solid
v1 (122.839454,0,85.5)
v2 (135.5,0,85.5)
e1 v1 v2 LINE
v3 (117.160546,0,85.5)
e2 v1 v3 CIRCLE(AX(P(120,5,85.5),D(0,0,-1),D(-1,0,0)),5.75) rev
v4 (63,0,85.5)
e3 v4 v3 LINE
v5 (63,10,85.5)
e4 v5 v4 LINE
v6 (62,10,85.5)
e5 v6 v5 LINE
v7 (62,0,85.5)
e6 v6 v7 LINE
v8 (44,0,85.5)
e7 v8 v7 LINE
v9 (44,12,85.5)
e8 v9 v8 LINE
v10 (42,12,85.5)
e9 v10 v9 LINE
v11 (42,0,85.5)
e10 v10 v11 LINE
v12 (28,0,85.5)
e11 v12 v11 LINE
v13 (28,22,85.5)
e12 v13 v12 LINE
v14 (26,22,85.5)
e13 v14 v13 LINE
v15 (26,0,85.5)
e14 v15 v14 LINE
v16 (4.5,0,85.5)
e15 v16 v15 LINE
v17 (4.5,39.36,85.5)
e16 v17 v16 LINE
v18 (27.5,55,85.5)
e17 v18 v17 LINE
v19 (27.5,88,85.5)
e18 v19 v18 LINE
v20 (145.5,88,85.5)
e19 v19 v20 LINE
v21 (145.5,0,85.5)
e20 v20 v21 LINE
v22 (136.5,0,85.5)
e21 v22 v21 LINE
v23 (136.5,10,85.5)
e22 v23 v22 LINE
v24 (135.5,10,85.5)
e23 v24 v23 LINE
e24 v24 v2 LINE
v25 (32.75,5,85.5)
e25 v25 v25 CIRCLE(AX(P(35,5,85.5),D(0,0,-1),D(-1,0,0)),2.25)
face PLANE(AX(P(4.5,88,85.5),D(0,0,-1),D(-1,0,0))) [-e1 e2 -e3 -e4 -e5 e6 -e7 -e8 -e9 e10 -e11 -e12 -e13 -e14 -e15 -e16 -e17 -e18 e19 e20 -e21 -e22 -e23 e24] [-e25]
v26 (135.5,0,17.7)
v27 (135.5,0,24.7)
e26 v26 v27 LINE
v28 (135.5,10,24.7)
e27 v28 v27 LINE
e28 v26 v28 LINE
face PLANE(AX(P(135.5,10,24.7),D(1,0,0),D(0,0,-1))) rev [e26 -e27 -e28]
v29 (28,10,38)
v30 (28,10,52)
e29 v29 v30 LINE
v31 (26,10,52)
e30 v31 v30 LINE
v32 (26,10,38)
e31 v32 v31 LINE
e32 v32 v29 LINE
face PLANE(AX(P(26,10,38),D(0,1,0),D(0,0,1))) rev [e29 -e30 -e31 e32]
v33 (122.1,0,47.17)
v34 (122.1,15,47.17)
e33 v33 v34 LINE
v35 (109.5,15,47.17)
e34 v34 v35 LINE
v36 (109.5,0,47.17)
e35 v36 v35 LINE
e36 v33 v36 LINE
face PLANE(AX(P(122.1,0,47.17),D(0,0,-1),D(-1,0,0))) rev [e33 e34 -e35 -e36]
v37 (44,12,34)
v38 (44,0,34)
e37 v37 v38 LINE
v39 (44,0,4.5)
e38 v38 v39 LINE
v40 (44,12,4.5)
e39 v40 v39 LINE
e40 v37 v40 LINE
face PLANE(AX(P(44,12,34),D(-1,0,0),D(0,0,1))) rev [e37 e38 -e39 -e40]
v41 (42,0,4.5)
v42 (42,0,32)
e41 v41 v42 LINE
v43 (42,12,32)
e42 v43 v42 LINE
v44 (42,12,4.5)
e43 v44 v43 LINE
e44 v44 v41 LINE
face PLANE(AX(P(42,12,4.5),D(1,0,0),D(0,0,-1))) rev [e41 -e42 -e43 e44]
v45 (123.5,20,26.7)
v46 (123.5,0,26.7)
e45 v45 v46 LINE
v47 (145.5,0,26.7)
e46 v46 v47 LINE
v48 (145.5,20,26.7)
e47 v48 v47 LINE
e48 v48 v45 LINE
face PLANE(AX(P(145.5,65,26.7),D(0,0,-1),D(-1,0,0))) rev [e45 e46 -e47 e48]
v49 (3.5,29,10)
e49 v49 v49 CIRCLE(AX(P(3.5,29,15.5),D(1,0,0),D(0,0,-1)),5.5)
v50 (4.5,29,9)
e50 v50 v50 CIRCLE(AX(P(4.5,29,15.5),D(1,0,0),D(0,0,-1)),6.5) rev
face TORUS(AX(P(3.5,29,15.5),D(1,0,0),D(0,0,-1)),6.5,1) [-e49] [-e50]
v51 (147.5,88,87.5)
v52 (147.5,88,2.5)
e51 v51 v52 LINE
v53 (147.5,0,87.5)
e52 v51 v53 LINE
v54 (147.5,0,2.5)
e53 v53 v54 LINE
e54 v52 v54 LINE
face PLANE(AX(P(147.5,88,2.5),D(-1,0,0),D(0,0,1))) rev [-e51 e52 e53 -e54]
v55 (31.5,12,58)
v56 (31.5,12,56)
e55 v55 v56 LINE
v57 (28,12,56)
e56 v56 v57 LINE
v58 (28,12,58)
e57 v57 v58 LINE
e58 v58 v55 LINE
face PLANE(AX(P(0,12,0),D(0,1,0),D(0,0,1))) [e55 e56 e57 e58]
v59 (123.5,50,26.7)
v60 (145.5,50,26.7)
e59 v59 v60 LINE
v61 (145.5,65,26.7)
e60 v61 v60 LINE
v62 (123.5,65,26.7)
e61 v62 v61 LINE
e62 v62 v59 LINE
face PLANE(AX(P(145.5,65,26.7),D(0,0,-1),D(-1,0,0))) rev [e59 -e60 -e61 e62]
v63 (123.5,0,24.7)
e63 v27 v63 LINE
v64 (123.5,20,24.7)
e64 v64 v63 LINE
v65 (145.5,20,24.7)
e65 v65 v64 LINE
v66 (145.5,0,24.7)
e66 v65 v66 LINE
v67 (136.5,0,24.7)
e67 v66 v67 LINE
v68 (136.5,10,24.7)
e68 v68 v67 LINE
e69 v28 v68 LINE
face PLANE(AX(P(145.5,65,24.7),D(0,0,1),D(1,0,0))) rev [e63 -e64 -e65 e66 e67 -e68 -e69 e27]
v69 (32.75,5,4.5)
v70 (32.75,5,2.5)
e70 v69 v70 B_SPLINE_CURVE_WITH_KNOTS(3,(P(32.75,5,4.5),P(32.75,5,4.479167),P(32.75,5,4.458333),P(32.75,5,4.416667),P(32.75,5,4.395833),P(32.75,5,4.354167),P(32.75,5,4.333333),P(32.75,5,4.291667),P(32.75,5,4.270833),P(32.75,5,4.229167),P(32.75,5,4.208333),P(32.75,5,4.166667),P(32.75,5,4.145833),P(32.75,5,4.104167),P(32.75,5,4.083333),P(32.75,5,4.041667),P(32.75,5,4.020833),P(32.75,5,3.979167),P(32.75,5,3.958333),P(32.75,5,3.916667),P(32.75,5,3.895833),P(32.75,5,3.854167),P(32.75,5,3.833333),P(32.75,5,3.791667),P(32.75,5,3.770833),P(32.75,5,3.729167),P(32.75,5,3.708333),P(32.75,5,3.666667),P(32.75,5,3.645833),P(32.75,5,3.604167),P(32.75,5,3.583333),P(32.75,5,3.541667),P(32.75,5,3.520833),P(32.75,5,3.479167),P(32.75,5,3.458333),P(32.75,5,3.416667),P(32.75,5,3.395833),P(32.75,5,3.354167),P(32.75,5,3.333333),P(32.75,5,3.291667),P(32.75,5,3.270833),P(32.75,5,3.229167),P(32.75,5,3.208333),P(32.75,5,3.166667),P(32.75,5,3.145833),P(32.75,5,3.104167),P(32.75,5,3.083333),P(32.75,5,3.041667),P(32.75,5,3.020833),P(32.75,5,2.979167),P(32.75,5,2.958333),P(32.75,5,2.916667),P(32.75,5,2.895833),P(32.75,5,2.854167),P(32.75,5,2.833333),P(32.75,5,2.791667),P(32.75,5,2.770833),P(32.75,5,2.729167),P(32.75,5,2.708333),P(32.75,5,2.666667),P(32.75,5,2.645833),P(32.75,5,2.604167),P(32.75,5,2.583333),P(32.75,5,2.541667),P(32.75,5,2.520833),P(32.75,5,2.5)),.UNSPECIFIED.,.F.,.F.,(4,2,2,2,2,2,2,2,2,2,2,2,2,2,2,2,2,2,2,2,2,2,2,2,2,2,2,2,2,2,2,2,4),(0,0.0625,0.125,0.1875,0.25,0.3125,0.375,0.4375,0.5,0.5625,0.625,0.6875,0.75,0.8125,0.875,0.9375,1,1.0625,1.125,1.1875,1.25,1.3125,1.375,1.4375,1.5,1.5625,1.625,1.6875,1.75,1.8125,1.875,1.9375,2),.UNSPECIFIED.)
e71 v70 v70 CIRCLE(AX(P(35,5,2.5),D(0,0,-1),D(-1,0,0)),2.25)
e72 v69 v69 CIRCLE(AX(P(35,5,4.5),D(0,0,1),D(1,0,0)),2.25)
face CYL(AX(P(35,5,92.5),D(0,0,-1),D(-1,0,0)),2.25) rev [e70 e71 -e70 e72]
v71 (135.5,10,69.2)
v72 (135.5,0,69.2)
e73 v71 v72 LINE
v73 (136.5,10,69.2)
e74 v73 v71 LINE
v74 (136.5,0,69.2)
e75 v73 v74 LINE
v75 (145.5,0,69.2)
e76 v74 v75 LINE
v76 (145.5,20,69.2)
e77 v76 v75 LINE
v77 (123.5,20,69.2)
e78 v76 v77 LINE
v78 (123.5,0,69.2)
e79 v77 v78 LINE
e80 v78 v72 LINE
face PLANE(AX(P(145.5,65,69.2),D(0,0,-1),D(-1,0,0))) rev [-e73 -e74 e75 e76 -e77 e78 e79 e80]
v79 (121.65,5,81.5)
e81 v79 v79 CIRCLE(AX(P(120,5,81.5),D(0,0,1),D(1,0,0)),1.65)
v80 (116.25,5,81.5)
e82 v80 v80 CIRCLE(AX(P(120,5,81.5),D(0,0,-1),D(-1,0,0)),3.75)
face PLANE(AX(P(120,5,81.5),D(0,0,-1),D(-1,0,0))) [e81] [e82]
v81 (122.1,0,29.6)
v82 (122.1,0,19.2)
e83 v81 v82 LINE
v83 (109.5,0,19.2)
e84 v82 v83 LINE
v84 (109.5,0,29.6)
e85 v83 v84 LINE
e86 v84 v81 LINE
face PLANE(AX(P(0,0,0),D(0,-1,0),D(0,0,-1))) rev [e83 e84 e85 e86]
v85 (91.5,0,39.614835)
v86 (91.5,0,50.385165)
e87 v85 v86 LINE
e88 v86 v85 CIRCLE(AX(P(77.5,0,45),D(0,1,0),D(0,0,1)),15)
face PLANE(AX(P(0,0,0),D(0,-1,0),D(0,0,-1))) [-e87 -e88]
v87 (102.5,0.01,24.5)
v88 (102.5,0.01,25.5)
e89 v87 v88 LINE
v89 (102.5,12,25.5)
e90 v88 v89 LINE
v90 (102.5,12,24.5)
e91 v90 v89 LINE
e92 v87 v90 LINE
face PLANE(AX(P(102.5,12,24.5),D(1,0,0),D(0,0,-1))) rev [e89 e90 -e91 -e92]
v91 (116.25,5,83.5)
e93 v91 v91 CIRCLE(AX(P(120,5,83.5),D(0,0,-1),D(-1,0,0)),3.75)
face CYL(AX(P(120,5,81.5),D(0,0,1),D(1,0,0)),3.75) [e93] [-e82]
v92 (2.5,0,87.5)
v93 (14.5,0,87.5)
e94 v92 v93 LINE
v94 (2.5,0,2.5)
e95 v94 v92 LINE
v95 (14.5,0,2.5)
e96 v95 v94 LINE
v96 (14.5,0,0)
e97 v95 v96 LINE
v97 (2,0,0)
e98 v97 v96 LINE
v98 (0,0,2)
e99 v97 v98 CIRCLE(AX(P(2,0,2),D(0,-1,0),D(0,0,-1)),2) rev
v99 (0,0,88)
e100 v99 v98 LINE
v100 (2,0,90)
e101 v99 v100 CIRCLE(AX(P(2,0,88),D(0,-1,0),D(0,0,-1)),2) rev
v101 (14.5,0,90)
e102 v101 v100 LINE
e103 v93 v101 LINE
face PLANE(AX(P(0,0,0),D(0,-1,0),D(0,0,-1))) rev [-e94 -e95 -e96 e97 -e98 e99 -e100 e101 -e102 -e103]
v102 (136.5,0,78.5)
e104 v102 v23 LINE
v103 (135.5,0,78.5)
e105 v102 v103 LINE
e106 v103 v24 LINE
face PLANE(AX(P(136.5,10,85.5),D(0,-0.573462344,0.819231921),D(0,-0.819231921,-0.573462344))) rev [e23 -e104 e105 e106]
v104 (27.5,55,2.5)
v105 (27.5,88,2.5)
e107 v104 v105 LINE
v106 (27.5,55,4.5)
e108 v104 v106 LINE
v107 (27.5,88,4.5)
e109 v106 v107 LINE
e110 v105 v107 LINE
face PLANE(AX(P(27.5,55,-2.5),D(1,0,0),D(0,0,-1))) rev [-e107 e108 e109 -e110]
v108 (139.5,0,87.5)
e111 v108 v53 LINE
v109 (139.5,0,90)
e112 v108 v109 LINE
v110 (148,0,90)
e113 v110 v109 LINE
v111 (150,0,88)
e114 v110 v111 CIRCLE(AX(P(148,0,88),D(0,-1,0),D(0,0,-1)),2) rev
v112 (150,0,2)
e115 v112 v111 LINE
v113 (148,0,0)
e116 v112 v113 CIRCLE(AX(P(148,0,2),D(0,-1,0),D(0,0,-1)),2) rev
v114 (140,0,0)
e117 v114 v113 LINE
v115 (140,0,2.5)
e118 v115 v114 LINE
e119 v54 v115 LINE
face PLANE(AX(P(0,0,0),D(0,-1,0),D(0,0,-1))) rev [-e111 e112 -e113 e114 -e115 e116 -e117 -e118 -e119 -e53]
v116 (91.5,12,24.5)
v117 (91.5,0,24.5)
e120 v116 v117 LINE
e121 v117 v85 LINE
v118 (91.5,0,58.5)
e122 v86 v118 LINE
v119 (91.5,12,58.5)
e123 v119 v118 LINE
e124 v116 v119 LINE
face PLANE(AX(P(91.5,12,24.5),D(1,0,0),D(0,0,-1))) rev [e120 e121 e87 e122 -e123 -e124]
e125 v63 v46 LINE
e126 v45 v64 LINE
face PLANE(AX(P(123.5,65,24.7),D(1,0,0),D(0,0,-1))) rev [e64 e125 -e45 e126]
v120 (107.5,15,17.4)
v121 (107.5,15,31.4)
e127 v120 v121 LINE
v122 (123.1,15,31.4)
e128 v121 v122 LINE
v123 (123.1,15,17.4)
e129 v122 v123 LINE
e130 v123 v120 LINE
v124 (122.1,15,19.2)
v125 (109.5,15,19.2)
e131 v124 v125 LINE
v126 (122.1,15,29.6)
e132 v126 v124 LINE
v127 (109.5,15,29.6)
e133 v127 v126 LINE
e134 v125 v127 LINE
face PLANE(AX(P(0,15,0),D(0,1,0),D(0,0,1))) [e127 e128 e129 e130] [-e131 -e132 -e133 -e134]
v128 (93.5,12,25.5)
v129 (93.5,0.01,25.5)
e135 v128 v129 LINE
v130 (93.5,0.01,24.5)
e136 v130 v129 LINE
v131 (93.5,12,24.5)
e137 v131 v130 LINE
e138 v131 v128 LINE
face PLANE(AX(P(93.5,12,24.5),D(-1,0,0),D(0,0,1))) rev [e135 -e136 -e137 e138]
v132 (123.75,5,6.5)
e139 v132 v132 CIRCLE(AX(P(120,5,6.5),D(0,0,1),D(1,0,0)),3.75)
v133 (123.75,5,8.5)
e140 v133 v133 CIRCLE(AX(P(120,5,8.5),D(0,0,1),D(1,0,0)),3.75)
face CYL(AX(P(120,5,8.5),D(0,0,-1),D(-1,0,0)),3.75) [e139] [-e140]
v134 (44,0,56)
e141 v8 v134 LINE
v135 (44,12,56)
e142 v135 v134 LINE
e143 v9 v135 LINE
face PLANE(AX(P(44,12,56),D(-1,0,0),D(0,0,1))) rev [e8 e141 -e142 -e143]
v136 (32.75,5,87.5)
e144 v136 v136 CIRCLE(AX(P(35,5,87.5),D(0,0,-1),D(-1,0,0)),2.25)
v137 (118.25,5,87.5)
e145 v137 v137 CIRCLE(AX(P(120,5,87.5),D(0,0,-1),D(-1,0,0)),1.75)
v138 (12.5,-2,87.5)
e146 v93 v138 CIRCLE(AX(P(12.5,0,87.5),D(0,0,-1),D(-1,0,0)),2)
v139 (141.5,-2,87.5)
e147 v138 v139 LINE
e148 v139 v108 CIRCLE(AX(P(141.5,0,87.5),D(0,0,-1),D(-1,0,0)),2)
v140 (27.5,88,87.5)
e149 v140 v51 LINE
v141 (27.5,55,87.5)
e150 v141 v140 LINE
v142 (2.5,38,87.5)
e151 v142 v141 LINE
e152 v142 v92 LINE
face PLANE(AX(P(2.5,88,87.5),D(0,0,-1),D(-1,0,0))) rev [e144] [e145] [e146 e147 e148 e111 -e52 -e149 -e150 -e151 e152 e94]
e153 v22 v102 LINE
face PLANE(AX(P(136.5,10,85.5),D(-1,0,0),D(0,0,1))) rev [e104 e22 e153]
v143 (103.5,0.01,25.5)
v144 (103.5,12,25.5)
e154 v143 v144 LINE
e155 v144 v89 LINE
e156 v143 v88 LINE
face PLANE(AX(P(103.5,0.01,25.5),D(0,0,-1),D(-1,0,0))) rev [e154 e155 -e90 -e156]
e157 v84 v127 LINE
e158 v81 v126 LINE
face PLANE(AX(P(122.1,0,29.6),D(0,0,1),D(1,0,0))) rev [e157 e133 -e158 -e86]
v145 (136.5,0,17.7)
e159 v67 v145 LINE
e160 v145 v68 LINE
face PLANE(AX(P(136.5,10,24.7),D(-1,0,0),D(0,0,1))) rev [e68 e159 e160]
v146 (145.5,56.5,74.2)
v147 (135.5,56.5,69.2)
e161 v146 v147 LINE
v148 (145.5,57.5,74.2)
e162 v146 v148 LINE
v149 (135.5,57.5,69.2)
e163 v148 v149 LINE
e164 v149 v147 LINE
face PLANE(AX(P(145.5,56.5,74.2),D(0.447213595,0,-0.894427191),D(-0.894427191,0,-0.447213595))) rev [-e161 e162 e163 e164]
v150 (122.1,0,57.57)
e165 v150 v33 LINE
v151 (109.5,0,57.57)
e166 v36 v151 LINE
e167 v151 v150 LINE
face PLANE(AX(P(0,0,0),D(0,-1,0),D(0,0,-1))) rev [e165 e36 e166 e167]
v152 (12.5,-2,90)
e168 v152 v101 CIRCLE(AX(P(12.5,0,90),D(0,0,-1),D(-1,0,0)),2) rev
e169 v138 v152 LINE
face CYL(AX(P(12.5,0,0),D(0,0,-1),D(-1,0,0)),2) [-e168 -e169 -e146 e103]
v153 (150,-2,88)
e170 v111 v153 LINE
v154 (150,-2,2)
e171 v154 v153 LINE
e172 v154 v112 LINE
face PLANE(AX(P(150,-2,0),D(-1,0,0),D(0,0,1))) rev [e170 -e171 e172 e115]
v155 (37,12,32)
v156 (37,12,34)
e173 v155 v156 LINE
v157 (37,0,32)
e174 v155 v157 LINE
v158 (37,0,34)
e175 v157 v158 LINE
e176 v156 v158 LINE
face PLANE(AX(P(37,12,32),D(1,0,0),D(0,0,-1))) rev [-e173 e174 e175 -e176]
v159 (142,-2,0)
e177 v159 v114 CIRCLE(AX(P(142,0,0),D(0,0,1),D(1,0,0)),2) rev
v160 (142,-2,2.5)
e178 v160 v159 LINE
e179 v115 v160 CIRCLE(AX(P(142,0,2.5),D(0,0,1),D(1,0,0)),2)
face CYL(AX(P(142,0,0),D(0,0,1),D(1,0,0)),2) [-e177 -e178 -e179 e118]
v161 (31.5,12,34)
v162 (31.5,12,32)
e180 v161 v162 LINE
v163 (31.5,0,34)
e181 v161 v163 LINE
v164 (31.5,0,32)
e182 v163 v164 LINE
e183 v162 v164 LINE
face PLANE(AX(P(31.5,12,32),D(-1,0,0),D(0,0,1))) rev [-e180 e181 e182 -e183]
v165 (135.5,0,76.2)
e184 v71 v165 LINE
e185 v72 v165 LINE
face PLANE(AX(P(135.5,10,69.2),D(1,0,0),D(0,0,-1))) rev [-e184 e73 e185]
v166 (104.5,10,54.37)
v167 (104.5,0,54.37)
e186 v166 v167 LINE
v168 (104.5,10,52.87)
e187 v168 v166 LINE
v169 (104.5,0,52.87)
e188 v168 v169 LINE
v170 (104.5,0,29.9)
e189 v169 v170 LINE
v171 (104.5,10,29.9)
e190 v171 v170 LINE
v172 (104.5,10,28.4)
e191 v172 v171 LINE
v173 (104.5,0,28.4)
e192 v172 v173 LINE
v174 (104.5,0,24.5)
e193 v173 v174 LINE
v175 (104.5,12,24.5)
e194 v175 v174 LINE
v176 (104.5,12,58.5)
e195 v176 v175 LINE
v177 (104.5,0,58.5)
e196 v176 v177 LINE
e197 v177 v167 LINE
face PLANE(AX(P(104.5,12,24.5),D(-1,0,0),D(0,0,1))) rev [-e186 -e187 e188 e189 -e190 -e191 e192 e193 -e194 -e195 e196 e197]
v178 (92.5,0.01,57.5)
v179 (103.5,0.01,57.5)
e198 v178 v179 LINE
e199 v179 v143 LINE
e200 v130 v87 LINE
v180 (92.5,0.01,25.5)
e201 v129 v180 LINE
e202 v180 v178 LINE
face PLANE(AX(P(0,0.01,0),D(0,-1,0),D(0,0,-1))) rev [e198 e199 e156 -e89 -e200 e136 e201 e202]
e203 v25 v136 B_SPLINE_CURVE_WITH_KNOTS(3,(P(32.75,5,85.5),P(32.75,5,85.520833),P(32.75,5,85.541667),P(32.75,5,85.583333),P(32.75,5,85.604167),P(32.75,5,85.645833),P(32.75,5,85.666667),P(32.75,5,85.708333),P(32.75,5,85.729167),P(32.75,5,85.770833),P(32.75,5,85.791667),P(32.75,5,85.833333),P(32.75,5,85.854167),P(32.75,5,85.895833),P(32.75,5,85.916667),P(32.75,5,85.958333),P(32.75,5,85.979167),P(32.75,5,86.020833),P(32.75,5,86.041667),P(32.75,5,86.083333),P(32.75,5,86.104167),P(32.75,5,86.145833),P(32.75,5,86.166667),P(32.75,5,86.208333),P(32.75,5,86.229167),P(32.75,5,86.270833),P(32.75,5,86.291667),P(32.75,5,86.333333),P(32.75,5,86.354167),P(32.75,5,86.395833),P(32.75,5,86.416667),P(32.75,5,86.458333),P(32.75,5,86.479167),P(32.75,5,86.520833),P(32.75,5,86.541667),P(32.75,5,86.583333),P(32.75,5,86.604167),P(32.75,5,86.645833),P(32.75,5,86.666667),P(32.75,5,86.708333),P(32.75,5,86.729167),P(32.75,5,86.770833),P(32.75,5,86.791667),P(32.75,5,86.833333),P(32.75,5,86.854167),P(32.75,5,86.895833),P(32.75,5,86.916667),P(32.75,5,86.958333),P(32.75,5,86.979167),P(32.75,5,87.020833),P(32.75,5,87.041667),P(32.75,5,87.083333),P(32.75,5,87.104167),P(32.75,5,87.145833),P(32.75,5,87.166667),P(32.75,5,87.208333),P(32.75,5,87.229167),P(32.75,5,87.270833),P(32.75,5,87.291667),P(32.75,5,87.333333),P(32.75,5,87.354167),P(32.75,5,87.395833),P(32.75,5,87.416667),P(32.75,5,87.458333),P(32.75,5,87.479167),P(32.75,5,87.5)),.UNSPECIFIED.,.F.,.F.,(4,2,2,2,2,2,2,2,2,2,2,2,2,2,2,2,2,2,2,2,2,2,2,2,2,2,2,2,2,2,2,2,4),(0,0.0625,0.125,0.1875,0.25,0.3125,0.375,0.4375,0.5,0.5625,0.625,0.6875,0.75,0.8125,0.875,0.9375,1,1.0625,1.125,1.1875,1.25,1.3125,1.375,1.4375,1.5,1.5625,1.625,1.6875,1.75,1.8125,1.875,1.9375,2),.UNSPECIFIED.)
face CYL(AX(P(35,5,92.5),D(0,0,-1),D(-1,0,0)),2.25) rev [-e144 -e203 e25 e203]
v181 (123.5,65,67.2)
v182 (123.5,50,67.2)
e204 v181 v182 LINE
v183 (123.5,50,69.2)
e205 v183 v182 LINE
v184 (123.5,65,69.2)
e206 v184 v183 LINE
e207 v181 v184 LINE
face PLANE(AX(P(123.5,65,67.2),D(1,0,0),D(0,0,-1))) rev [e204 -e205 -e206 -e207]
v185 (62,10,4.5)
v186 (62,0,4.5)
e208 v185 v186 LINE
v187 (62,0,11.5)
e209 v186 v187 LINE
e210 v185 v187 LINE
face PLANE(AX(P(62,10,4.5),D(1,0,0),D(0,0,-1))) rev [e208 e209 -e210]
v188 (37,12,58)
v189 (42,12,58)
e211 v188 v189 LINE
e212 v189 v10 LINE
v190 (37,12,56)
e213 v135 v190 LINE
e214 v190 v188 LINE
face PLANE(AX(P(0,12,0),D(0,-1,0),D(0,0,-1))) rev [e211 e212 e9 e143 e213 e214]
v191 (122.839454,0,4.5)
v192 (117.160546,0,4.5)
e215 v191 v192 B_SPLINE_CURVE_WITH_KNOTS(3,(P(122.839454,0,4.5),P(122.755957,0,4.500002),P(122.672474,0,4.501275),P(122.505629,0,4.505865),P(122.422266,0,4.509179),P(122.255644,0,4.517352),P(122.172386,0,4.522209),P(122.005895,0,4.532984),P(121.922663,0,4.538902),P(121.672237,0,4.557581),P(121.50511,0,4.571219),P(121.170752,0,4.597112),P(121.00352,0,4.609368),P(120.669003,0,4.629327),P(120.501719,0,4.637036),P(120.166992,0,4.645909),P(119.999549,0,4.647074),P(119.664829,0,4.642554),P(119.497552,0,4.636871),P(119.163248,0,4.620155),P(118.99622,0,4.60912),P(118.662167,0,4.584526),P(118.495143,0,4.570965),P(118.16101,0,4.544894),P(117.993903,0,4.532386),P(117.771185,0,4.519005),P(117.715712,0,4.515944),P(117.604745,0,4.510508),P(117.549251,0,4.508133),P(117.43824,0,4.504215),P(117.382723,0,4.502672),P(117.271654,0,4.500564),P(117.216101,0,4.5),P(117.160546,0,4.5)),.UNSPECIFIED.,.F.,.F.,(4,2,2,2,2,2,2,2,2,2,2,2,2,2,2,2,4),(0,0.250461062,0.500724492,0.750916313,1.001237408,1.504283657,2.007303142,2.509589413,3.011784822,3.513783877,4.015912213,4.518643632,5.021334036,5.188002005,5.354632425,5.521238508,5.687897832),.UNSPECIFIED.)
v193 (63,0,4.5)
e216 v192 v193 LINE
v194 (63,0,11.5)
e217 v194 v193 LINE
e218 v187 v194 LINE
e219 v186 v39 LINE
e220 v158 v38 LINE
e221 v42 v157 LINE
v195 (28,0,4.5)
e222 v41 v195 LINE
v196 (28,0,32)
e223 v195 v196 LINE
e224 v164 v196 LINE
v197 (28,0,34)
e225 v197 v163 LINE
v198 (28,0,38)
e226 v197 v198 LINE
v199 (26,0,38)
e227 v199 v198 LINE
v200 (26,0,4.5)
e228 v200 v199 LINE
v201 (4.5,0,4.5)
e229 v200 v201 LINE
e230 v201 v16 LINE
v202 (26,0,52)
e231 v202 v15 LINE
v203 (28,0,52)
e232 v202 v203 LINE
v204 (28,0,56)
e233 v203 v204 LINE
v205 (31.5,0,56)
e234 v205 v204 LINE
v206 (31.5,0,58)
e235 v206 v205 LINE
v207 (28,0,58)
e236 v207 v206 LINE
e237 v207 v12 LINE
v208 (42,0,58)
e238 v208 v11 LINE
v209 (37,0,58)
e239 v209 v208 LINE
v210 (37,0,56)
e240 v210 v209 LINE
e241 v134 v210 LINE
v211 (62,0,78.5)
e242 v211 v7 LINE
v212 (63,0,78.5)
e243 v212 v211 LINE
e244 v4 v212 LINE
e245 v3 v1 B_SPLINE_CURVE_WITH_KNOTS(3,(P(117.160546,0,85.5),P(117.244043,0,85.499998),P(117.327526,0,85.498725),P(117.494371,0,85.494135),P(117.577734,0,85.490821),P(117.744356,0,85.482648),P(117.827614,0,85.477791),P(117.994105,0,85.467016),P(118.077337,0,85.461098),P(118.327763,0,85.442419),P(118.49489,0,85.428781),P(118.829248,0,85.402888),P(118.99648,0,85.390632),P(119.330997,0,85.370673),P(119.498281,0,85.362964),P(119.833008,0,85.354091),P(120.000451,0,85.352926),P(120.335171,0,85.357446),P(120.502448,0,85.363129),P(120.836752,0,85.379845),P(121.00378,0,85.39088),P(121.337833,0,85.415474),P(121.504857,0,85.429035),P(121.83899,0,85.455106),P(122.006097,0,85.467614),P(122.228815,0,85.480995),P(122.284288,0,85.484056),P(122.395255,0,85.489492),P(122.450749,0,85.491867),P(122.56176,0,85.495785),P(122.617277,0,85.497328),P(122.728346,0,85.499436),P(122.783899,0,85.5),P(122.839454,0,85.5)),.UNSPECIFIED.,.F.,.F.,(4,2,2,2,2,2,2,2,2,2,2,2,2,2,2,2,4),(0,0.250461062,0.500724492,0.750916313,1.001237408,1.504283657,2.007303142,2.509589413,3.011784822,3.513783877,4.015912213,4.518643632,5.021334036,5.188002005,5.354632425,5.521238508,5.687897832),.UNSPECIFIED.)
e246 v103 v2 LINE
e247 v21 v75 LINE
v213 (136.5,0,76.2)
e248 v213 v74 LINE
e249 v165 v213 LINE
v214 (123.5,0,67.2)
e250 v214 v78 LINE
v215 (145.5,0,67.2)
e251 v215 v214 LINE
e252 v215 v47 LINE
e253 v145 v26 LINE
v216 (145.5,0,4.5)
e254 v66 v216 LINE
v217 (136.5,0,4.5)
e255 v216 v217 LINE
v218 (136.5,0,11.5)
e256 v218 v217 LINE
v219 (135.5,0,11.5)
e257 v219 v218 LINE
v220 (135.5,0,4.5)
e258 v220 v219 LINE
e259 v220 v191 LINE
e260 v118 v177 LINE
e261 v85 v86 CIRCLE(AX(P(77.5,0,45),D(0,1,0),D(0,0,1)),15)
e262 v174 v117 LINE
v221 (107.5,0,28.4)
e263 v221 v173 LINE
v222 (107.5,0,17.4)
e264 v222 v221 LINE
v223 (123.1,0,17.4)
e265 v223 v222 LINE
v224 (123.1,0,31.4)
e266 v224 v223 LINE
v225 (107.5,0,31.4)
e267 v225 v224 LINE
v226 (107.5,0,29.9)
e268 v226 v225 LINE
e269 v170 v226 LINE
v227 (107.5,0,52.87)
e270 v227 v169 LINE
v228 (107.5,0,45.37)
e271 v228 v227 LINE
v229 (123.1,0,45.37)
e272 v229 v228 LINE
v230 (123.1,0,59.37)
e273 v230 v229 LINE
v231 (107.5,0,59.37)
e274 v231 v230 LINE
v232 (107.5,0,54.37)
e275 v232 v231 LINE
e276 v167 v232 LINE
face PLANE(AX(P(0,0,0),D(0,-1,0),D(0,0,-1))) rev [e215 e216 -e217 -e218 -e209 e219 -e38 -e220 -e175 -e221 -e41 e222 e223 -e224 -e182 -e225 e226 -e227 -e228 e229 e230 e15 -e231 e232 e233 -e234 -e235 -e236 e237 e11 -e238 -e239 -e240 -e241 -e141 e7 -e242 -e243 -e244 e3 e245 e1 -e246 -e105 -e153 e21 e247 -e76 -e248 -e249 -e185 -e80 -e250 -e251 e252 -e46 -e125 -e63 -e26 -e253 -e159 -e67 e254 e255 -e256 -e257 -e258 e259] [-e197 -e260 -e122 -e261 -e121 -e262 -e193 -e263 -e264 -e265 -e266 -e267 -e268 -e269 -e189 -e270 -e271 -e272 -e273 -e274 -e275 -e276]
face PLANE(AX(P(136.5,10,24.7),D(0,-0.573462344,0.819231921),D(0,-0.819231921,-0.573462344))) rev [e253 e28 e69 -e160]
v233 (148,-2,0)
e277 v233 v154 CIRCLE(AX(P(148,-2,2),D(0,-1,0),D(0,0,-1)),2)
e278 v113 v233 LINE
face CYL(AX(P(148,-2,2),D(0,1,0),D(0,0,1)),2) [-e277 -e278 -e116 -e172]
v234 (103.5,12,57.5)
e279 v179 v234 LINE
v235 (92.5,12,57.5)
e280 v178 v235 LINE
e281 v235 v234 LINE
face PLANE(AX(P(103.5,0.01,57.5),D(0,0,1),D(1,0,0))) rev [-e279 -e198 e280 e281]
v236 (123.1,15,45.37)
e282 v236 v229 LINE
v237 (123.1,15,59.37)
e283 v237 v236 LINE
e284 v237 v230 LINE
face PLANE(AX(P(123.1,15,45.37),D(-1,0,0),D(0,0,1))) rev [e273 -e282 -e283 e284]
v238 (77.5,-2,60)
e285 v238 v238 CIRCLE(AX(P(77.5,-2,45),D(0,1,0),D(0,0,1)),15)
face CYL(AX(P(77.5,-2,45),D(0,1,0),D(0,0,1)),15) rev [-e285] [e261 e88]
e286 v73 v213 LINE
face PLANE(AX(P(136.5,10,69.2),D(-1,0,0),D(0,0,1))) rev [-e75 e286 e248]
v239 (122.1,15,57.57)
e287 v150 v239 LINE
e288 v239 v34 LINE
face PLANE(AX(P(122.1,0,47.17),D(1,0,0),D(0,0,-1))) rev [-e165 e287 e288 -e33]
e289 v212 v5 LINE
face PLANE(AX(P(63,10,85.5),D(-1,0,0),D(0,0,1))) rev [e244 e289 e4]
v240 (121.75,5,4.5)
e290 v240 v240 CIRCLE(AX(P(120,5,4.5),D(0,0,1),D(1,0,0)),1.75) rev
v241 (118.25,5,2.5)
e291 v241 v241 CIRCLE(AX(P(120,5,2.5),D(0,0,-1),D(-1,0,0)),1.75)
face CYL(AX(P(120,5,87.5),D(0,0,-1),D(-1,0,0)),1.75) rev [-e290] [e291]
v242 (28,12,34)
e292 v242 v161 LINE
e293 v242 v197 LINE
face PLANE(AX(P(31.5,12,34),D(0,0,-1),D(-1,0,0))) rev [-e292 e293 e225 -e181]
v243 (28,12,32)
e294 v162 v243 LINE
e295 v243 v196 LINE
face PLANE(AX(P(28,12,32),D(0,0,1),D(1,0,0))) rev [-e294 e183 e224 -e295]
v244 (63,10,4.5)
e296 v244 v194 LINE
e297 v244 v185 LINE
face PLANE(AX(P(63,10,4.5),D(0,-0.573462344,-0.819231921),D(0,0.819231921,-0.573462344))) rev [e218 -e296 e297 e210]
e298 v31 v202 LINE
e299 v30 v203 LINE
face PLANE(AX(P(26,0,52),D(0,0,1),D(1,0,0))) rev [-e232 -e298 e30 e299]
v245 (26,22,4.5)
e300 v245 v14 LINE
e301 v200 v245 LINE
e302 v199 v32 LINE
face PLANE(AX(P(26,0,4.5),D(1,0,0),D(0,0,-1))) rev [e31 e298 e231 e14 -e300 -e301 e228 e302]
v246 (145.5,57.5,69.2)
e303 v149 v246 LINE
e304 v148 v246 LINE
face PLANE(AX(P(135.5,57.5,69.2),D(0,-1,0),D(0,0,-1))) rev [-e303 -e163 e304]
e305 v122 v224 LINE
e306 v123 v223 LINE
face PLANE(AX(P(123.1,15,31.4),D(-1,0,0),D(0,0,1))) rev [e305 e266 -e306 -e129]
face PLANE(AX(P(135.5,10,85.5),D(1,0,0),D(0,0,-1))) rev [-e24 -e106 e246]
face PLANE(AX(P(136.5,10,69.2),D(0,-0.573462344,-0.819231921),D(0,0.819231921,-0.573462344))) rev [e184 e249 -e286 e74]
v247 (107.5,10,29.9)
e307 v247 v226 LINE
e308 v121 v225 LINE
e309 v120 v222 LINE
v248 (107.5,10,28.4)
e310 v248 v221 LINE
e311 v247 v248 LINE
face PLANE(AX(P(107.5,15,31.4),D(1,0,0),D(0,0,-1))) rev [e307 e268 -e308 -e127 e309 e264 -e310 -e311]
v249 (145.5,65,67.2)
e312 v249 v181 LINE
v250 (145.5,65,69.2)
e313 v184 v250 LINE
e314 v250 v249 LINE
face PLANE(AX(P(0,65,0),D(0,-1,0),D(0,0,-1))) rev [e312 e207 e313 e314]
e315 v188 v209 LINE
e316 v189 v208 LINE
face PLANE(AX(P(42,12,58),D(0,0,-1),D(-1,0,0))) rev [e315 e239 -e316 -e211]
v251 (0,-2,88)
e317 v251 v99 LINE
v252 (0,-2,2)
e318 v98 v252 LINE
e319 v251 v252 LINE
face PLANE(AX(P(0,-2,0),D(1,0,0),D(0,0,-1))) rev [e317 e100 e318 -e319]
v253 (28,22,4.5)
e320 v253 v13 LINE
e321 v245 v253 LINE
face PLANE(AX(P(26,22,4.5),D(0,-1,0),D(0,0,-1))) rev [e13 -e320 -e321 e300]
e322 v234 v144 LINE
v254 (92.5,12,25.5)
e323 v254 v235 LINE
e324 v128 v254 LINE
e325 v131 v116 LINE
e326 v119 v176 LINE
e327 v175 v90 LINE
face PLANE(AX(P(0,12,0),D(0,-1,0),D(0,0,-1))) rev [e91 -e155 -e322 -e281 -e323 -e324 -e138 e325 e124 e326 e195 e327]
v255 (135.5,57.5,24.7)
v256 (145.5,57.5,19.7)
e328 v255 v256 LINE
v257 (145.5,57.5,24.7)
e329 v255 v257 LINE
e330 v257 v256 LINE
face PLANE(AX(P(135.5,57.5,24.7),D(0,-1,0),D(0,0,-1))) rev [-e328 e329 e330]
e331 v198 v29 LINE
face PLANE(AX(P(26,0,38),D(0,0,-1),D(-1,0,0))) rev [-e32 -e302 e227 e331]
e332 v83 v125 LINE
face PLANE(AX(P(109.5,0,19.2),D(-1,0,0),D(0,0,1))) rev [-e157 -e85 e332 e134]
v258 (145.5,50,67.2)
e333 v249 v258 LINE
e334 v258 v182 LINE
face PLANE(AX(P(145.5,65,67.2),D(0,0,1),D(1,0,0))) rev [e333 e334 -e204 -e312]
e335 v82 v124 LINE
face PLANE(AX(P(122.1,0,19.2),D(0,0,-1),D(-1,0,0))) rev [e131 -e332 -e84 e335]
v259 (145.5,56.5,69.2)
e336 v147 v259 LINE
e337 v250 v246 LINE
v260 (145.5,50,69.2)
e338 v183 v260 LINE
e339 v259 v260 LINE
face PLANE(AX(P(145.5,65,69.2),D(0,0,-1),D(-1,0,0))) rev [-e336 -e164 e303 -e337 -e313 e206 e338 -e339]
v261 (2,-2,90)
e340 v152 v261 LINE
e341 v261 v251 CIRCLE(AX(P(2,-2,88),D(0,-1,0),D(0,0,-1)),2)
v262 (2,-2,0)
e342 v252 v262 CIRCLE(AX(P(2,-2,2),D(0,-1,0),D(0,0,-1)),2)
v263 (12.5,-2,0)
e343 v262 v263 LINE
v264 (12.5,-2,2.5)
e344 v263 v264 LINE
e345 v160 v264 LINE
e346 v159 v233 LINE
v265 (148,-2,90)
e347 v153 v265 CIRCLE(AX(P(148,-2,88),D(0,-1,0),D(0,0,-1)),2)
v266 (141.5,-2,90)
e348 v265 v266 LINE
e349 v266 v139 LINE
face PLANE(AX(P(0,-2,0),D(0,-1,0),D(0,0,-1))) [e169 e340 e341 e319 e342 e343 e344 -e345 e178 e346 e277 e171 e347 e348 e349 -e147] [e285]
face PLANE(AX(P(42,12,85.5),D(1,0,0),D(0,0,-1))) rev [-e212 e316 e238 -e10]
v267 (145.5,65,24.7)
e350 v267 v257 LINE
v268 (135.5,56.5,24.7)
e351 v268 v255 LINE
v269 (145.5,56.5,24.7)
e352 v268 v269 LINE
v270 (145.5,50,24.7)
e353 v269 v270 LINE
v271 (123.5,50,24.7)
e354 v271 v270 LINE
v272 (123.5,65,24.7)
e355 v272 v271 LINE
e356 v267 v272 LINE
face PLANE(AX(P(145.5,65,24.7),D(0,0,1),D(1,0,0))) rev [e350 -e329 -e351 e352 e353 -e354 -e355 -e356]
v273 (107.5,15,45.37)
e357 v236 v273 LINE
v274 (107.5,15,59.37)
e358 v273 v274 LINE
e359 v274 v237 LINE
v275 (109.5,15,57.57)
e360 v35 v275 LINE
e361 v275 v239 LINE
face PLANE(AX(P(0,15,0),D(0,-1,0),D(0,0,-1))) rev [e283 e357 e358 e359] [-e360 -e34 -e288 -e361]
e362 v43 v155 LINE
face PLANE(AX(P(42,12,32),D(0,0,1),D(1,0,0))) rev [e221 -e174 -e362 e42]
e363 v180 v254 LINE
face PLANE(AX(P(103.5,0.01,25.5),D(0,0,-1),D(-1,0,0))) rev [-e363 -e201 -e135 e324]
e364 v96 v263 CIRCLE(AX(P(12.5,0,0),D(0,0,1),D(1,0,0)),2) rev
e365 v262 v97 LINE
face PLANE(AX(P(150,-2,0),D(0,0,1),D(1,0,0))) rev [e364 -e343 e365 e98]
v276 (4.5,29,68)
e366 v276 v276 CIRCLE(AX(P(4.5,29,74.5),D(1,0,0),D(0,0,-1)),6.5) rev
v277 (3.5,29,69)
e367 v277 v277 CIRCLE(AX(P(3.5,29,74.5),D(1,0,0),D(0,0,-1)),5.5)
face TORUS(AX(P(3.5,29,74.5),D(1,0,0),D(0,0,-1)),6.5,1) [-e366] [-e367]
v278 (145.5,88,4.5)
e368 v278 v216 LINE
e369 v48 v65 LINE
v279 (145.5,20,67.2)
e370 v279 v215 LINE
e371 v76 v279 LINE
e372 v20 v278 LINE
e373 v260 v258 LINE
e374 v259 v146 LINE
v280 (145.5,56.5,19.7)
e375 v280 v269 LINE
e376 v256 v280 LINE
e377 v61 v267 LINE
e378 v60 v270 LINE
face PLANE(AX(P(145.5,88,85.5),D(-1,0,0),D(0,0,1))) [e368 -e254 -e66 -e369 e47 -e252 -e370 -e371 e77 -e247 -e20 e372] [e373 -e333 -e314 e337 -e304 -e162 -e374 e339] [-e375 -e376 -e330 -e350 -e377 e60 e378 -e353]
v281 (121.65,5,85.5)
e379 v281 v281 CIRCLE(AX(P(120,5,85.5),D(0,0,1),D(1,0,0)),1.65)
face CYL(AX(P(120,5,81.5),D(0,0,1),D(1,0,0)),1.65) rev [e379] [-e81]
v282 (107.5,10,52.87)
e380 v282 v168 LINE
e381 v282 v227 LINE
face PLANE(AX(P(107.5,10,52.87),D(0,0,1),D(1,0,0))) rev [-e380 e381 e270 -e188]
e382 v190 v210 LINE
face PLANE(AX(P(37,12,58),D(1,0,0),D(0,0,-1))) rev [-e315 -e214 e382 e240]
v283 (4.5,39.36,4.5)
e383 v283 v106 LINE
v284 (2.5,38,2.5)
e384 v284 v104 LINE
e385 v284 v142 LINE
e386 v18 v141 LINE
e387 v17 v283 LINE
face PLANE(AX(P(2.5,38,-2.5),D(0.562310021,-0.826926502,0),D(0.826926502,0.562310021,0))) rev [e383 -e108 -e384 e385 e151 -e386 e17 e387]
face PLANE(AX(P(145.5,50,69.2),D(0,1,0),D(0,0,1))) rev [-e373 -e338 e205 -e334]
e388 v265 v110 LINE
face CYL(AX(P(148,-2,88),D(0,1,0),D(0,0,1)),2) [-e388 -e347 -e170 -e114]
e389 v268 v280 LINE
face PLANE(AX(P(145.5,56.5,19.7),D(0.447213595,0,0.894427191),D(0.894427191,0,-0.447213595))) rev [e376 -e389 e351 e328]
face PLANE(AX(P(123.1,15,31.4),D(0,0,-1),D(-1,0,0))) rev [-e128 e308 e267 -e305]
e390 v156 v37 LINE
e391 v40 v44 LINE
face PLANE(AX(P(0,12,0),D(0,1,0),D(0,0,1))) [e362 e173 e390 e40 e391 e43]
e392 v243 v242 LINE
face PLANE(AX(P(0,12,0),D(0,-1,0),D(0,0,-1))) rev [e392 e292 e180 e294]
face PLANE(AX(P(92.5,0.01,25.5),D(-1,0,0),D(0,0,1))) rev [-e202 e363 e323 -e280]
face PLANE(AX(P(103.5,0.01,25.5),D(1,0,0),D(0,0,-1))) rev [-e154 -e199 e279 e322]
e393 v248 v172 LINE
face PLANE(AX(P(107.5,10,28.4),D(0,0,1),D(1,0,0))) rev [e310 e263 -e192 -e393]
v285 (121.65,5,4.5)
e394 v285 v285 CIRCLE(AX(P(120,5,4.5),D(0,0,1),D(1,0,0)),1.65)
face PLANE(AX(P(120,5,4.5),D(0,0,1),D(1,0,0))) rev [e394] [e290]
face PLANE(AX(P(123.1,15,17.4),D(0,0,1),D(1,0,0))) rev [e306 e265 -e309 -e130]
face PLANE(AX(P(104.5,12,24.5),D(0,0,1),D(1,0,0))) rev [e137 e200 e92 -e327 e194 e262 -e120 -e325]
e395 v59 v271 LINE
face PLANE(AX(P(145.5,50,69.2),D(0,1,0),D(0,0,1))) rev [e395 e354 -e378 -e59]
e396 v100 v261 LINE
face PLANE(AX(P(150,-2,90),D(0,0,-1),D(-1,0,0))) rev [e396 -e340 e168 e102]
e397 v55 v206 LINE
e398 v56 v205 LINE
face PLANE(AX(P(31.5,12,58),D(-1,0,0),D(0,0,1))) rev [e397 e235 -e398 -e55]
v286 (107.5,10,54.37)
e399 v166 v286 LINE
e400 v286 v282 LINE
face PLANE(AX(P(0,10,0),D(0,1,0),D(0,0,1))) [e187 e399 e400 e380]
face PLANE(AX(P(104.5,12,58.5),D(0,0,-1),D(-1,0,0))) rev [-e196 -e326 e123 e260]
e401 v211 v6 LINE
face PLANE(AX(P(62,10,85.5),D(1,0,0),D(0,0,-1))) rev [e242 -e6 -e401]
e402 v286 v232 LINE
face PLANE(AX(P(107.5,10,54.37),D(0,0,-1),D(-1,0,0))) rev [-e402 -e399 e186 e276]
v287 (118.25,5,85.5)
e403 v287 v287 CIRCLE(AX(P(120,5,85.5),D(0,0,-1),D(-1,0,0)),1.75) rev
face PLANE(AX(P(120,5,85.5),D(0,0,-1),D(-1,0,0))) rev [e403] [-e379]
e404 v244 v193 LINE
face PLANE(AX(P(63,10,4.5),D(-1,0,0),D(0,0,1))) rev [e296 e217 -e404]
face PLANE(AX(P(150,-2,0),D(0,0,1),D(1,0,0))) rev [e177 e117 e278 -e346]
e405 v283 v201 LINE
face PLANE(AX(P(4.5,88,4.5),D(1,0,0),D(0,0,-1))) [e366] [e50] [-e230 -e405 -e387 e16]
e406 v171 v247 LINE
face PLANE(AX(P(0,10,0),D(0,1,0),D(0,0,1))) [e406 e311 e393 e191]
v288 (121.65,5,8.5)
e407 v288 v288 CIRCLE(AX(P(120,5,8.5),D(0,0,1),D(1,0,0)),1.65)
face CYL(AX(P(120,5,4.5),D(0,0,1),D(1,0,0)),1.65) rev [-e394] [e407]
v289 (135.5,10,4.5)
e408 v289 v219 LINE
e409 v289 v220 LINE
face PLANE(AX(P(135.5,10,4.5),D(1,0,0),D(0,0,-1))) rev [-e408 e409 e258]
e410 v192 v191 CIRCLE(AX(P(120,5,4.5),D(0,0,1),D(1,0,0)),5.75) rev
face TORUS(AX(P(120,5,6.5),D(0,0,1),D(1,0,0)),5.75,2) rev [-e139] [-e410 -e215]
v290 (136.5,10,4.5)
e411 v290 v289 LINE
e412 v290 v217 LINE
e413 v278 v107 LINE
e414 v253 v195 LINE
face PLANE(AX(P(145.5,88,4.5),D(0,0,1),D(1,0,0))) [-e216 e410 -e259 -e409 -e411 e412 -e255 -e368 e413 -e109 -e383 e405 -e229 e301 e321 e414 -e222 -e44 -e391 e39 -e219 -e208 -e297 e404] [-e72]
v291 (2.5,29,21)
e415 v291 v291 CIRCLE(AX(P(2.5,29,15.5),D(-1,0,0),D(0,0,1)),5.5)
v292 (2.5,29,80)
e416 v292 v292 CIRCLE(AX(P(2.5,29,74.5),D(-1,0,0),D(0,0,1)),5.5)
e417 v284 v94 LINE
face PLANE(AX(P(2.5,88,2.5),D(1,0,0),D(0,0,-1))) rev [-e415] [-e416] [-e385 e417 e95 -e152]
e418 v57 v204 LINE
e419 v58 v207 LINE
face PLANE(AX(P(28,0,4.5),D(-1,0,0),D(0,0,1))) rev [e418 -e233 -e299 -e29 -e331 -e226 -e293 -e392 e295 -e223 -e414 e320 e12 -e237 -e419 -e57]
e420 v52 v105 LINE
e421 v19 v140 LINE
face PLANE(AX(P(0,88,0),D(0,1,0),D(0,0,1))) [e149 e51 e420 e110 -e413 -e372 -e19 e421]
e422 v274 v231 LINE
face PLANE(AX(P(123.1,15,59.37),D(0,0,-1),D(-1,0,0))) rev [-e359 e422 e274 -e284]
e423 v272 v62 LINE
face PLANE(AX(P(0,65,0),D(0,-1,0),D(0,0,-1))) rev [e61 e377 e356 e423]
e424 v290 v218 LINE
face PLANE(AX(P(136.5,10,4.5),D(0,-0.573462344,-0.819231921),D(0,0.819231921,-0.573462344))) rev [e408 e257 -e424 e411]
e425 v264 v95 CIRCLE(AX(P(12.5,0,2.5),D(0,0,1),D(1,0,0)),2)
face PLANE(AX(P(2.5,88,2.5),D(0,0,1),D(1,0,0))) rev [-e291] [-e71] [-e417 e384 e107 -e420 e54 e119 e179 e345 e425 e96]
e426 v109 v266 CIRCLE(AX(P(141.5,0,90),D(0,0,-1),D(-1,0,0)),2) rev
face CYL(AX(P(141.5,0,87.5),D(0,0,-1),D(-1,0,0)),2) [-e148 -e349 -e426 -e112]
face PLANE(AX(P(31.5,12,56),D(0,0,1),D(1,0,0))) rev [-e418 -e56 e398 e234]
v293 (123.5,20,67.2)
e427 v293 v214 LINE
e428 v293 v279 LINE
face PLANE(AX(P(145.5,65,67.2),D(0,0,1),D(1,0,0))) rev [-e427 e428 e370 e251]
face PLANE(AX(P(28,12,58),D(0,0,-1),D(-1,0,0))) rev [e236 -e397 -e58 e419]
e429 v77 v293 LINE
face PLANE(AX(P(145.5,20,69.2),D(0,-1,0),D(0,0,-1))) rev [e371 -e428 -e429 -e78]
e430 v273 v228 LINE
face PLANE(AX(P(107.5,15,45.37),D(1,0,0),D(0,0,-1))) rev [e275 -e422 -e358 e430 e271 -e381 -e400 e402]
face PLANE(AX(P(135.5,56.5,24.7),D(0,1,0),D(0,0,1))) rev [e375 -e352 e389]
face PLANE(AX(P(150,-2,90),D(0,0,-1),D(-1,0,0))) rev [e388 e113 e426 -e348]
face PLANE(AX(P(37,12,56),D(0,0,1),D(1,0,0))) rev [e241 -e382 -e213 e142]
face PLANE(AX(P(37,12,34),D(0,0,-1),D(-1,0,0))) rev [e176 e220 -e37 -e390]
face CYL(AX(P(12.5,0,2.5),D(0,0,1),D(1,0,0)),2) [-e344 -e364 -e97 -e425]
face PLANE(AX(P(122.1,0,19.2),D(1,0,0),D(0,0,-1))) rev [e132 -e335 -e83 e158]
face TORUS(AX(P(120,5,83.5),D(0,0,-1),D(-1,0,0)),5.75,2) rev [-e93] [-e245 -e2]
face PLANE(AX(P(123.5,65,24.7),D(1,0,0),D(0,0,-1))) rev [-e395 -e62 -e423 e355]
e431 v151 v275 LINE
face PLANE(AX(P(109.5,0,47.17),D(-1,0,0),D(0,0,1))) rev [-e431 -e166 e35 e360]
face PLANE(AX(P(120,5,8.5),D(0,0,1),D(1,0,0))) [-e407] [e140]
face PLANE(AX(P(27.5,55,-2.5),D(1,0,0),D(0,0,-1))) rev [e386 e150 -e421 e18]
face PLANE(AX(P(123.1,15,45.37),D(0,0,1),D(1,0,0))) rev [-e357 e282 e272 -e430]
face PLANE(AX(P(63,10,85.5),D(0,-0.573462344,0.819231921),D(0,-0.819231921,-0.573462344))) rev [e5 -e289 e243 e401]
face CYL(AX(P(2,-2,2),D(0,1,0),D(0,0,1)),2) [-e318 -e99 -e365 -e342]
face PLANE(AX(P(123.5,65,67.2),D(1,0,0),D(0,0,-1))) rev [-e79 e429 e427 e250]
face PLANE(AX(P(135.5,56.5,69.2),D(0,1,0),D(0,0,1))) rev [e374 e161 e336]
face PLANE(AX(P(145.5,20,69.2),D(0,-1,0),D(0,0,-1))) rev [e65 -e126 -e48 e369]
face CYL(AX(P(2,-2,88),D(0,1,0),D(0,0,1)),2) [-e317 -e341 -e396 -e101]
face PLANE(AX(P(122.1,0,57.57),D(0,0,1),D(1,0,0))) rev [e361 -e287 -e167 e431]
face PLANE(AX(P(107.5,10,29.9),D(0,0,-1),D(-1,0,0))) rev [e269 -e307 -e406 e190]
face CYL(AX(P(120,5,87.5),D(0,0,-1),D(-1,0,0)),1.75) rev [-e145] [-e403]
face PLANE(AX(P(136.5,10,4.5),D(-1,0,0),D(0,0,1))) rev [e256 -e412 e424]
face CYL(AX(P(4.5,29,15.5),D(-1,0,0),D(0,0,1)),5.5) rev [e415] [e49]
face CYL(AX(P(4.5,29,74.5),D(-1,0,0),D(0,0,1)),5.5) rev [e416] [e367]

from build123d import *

# Parameters (mm, degrees)
ESQUISSE1_W              = 150
ESQUISSE1_H              = 90
BOSS_EXTRU_1_DEPTH       = 2
ESQUISSE2_W              = 145
ESQUISSE2_H              = 85
ESQUISSE2_W_2            = 141
ESQUISSE2_H_2            = 81
BOSS_EXTRU_2_DEPTH       = 88
ESQUISSE3_R              = 15
ENL_V_MAT_EXTRU_1_DEPTH  = 2
ENL_V_MAT_EXTRU_2_DEPTH  = 90
ESQUISSE6_R              = 2.25
ENL_V_MAT_EXTRU_4_DEPTH  = 90
CONG_1_R                 = 2
ESQUISSE9_W              = 2
ESQUISSE9_H              = 22
BOSS_EXTRU_5_DEPTH       = 81
ESQUISSE11_W             = 3.5
ESQUISSE11_H             = 2
BOSS_EXTRU_6_DEPTH       = 12
ESQUISSE13_R             = 5.5
ENL_V_MAT_EXTRU_5_DEPTH  = 2
CONG_2_R                 = 1
ESQUISSE14_W             = 22
ESQUISSE14_H             = 2
BOSS_EXTRU_7_DEPTH       = 65
ESQUISSE16_W             = 125
ESQUISSE16_H             = 2
ENL_V_MAT_EXTRU_6_DEPTH  = 2.5
ESQUISSE18_W             = 125.5
ESQUISSE18_H             = 2
ENL_V_MAT_EXTRU_7_DEPTH  = 2.5
CONG_3_R                 = 2
ESQUISSE26_R             = 1.75
ENL_V_MAT_EXTRU_12_DEPTH = 85
ESQUISSE19_W             = 14
ESQUISSE19_H             = 10
ENL_V_MAT_EXTRU_8_DEPTH  = 2
ESQUISSE20_W             = 15.6
ESQUISSE20_H             = 14
BOSS_EXTRU_8_DEPTH       = 15
ESQUISSE23_W             = 22
ESQUISSE23_H             = 30
ENL_V_MAT_EXTRU_10_DEPTH = 44.5
ESQUISSE21_W             = 12.6
ESQUISSE21_H             = 10.4
ENL_V_MAT_EXTRU_9_DEPTH  = 15
ESQUISSE27_R             = 3.75
BOSS_EXTRU_9_DEPTH       = 4
ESQUISSE29_R             = 1.65
ENL_V_MAT_EXTRU_13_DEPTH = 4
BOSS_EXTRU_10_START      = 4
ESQUISSE30_R             = 3.75
BOSS_EXTRU_10_DEPTH      = 4
ESQUISSE31_R             = 1.65
ENL_V_MAT_EXTRU_14_DEPTH = 4
CONG_4_R                 = 2
CONG_5_R                 = 2
ESQUISSE38_W             = 13
ESQUISSE38_H             = 34
BOSS_EXTRU_13_DEPTH      = 12
ESQUISSE40_W             = 11
ESQUISSE40_H             = 32
ENL_V_MAT_EXTRU_18_DEPTH = 11.99
ESQUISSE41_W             = 9
ESQUISSE41_H             = 11.99
ENL_V_MAT_EXTRU_19_DEPTH = 1
ESQUISSE33_W             = 1
ESQUISSE33_H             = 7
ESQUISSE33_W_2           = 3
ESQUISSE33_H_2           = 1.5
BOSS_EXTRU_11_DEPTH      = 10
ENL_V_MAT_EXTRU_15_DEPTH = 1
ENL_V_MAT_EXTRU_16_DEPTH = 1
ESQUISSE36_W             = 5
ESQUISSE36_H             = 1
BOSS_EXTRU_12_DEPTH      = 10
ENL_V_MAT_EXTRU_17_DEPTH = 1


# Some blends are built 0.0001 mm under size
with BuildPart() as part:
    # Esquisse1 → Boss.-Extru.1 (new body)
    with BuildSketch(Plane.XZ):
        with Locations((75, 45)):
            Rectangle(ESQUISSE1_W, ESQUISSE1_H)
    extrude(amount=BOSS_EXTRU_1_DEPTH)

    # Esquisse2 → Boss.-Extru.2 (add)
    with BuildSketch(Plane(origin=(0, 0, 0), x_dir=(1, 0, 0), z_dir=(0, 1, 0))):
        with Locations((75, -45)):
            Rectangle(ESQUISSE2_W, ESQUISSE2_H)
        with Locations((75, -45)):
            Rectangle(ESQUISSE2_W_2, ESQUISSE2_H_2, mode=Mode.SUBTRACT)
    extrude(amount=BOSS_EXTRU_2_DEPTH)

    # Esquisse3 → Enlèv. mat.-Extru.1 (cut)
    with BuildSketch(Plane(origin=(0, 0, 0), x_dir=(1, 0, 0), z_dir=(0, 1, 0))):
        with Locations(Location((77.5, -45, 0), (0, 0, 270))):
            Circle(ESQUISSE3_R)
    extrude(amount=-ENL_V_MAT_EXTRU_1_DEPTH, mode=Mode.SUBTRACT)

    # Esquisse4 → Enlèv. mat.-Extru.2 (cut)
    with BuildSketch(Plane.XY.offset(87.5)):
        Polygon((2.5, 38), (27.5, 55), (27.5, 88), (2.5, 88), align=None)
    extrude(amount=-ENL_V_MAT_EXTRU_2_DEPTH, mode=Mode.SUBTRACT)

    # Esquisse6 → Enlèv. mat.-Extru.4 (cut)
    with BuildSketch(Plane(origin=(0, 0, 2.5), x_dir=(-1, 0, 0), z_dir=(0, 0, -1))):
        with Locations((-35, 5)):
            Circle(ESQUISSE6_R)
    extrude(amount=-ENL_V_MAT_EXTRU_4_DEPTH, mode=Mode.SUBTRACT)

    # Congé1
    cong_1_edges = [part.edges().sort_by_distance(p)[0] for p in [
        (150, -1, 0),
        (0, -1, 0),
        (0, -1, 90),
        (150, -1, 90),
    ]]
    fillet(cong_1_edges, radius=CONG_1_R)

    # Esquisse9 → Boss.-Extru.5 (add)
    with BuildSketch(Plane(origin=(0, 0, 85.5), x_dir=(-1, 0, 0), z_dir=(0, 0, -1))):
        with Locations((-27, 11)):
            Rectangle(ESQUISSE9_W, ESQUISSE9_H)
    extrude(amount=BOSS_EXTRU_5_DEPTH)

    # Esquisse11 → Boss.-Extru.6 (add)
    with BuildSketch(Plane(origin=(0, 0, 0), x_dir=(1, 0, 0), z_dir=(0, 1, 0))):
        with Locations((29.75, -57)):
            Rectangle(ESQUISSE11_W, ESQUISSE11_H)
        with Locations((29.75, -33)):
            Rectangle(ESQUISSE11_W, ESQUISSE11_H)
        Polygon((37, -32), (37, -34), (44, -34), (44, -4.5), (42, -4.5), (42, -32), align=None)
        Polygon((37, -56), (44, -56), (44, -85.5), (42, -85.5), (42, -58), (37, -58), align=None)
    extrude(amount=BOSS_EXTRU_6_DEPTH)

    # Esquisse13 → Enlèv. mat.-Extru.5 (cut)
    with BuildSketch(Plane.ZY.offset(-2.5)):
        with Locations((15.5, 29)):
            Circle(ESQUISSE13_R)
        with Locations((74.5, 29)):
            Circle(ESQUISSE13_R)
    extrude(amount=-ENL_V_MAT_EXTRU_5_DEPTH, mode=Mode.SUBTRACT)

    # Congé2
    cong_2_edges = [part.edges().sort_by_distance(p)[0] for p in [
        (4.5, 29, 10),
        (4.5, 29, 69),
    ]]
    fillet(cong_2_edges, radius=CONG_2_R)

    # Esquisse14 → Boss.-Extru.7 (add)
    with BuildSketch(Plane(origin=(0, 0, 0), x_dir=(1, 0, 0), z_dir=(0, 1, 0))):
        with Locations((134.5, -25.7)):
            Rectangle(ESQUISSE14_W, ESQUISSE14_H)
        with Locations((134.5, -68.2)):
            Rectangle(ESQUISSE14_W, ESQUISSE14_H)
    extrude(amount=BOSS_EXTRU_7_DEPTH)

    # Esquisse16 → Enlèv. mat.-Extru.6 (cut)
    with BuildSketch(Plane.XY.offset(90)):
        with Locations((77, -1)):
            Rectangle(ESQUISSE16_W, ESQUISSE16_H)
    extrude(amount=-ENL_V_MAT_EXTRU_6_DEPTH, mode=Mode.SUBTRACT)

    # Esquisse18 → Enlèv. mat.-Extru.7 (cut)
    with BuildSketch(Plane(origin=(0, 0, 0), x_dir=(-1, 0, 0), z_dir=(0, 0, -1))):
        with Locations((-77.25, -1)):
            Rectangle(ESQUISSE18_W, ESQUISSE18_H)
    extrude(amount=-ENL_V_MAT_EXTRU_7_DEPTH, mode=Mode.SUBTRACT)

    # Congé3
    cong_3_edges = [part.edges().sort_by_distance(p)[0] for p in [
        (140, -2, 1.25),
        (14.5, -2, 1.25),
        (14.5, -2, 88.75),
        (139.5, -2, 88.75),
    ]]
    fillet(cong_3_edges, radius=CONG_3_R - 0.0001)  # a hair under: the kernel refuses the full size

    # Esquisse26 → Enlèv. mat.-Extru.12 (cut)
    with BuildSketch(Plane(origin=(0, 0, 2.5), x_dir=(-1, 0, 0), z_dir=(0, 0, -1))):
        with Locations((-120, 5)):
            Circle(ESQUISSE26_R)
    extrude(amount=-ENL_V_MAT_EXTRU_12_DEPTH, mode=Mode.SUBTRACT)

    # Esquisse19 → Enlèv. mat.-Extru.8 (cut)
    with BuildSketch(Plane(origin=(28, 0, 0), x_dir=(0, 0, -1), z_dir=(1, 0, 0))):
        with Locations((-45, 5)):
            Rectangle(ESQUISSE19_W, ESQUISSE19_H)
    extrude(amount=-ENL_V_MAT_EXTRU_8_DEPTH, mode=Mode.SUBTRACT)

    # Esquisse20 → Boss.-Extru.8 (add)
    with BuildSketch(Plane(origin=(0, 0, 0), x_dir=(1, 0, 0), z_dir=(0, 1, 0))):
        with Locations((115.3, -24.4)):
            Rectangle(ESQUISSE20_W, ESQUISSE20_H)
        with Locations((115.3, -52.37)):
            Rectangle(ESQUISSE20_W, ESQUISSE20_H)
    extrude(amount=BOSS_EXTRU_8_DEPTH)

    # Esquisse23 → Enlèv. mat.-Extru.10 (cut)
    with BuildSketch(Plane(origin=(0, 0, 24.7), x_dir=(-1, 0, 0), z_dir=(0, 0, -1))):
        with Locations((-134.5, 35)):
            Rectangle(ESQUISSE23_W, ESQUISSE23_H)
    extrude(amount=-ENL_V_MAT_EXTRU_10_DEPTH, mode=Mode.SUBTRACT)

    # Esquisse21 → Enlèv. mat.-Extru.9 (cut)
    with BuildSketch(Plane(origin=(0, 15, 0), x_dir=(1, 0, 0), z_dir=(0, 1, 0))):
        with Locations((115.8, -24.4)):
            Rectangle(ESQUISSE21_W, ESQUISSE21_H)
        with Locations((115.8, -52.37)):
            Rectangle(ESQUISSE21_W, ESQUISSE21_H)
    extrude(amount=-ENL_V_MAT_EXTRU_9_DEPTH, mode=Mode.SUBTRACT)

    # Esquisse27 → Boss.-Extru.9 (add)
    with BuildSketch(Plane.XY.offset(4.5)):
        with Locations((120, 5)):
            Circle(ESQUISSE27_R)
    extrude(amount=BOSS_EXTRU_9_DEPTH)

    # Esquisse29 → Enlèv. mat.-Extru.13 (cut)
    with BuildSketch(Plane.XY.offset(8.5)):
        with Locations((120, 5)):
            Circle(ESQUISSE29_R)
    extrude(amount=-ENL_V_MAT_EXTRU_13_DEPTH, mode=Mode.SUBTRACT)

    # Esquisse30 → Boss.-Extru.10 (add)
    with BuildSketch(Plane(origin=(0, 0, 85.5), x_dir=(-1, 0, 0), z_dir=(0, 0, -1)).offset(BOSS_EXTRU_10_START)):
        with Locations(Location((-120, 5, 0), (0, 0, 180))):
            Circle(ESQUISSE30_R)
    extrude(amount=-BOSS_EXTRU_10_DEPTH)

    # Esquisse31 → Enlèv. mat.-Extru.14 (cut)
    with BuildSketch(Plane.XY.offset(85.5)):
        with Locations((120, 5)):
            Circle(ESQUISSE31_R)
    extrude(amount=-ENL_V_MAT_EXTRU_14_DEPTH, mode=Mode.SUBTRACT)

    # Congé4
    # the kernel refuses this fillet: 2 mm, written as the material it adds along each edge
    with BuildSketch(Plane(origin=(120, 5, 85.5), x_dir=(1, 0, 0), z_dir=(0, 1, 0))) as cong_4_piece_1:
        with BuildLine():
            CenterArc((3.75 + CONG_4_R, CONG_4_R), CONG_4_R, 180, 90)
            Line((3.75, CONG_4_R), (3.75, 0))
            Line((3.75, 0), (3.75 + CONG_4_R, 0))
        make_face()
    revolve(axis=Axis((120, 5, 85.5), (0, 0, -1)))

    # Congé5
    # the kernel refuses this fillet: 2 mm, written as the material it adds along each edge
    with BuildSketch(Plane(origin=(120, 5, 4.5), x_dir=(1, 0, 0), z_dir=(0, -1, 0))) as cong_5_piece_1:
        with BuildLine():
            CenterArc((3.75 + CONG_5_R, CONG_5_R), CONG_5_R, 180, 90)
            Line((3.75, CONG_5_R), (3.75, 0))
            Line((3.75, 0), (3.75 + CONG_5_R, 0))
        make_face()
    revolve(axis=Axis((120, 5, 4.5), (0, 0, 1)))

    # Esquisse38 → Boss.-Extru.13 (add)
    with BuildSketch(Plane(origin=(0, 0, 0), x_dir=(1, 0, 0), z_dir=(0, 1, 0))):
        with Locations((98, -41.5)):
            Rectangle(ESQUISSE38_W, ESQUISSE38_H)
    extrude(amount=BOSS_EXTRU_13_DEPTH)

    # Esquisse40 → Enlèv. mat.-Extru.18 (cut)
    with BuildSketch(Plane(origin=(0, 12, 0), x_dir=(1, 0, 0), z_dir=(0, 1, 0))):
        with Locations((98, -41.5)):
            Rectangle(ESQUISSE40_W, ESQUISSE40_H)
    extrude(amount=-ENL_V_MAT_EXTRU_18_DEPTH, mode=Mode.SUBTRACT)

    # Esquisse41 → Enlèv. mat.-Extru.19 (cut)
    with BuildSketch(Plane.XY.offset(25.5)):
        with Locations((98, 6.005)):
            Rectangle(ESQUISSE41_W, ESQUISSE41_H)
    extrude(amount=-ENL_V_MAT_EXTRU_19_DEPTH, mode=Mode.SUBTRACT)

    # Esquisse33 → Boss.-Extru.11 (add)
    with BuildSketch(Plane(origin=(0, 0, 0), x_dir=(1, 0, 0), z_dir=(0, 1, 0))):
        with Locations((62.5, -8)):
            Rectangle(ESQUISSE33_W, ESQUISSE33_H)
        with Locations((136, -8)):
            Rectangle(ESQUISSE33_W, ESQUISSE33_H)
        with Locations((136, -21.2)):
            Rectangle(ESQUISSE33_W, ESQUISSE33_H)
        with Locations((136, -72.7)):
            Rectangle(ESQUISSE33_W, ESQUISSE33_H)
        with Locations((136, -82)):
            Rectangle(ESQUISSE33_W, ESQUISSE33_H)
        with Locations((62.5, -82)):
            Rectangle(ESQUISSE33_W, ESQUISSE33_H)
        with Locations((106, -53.62)):
            Rectangle(ESQUISSE33_W_2, ESQUISSE33_H_2)
        with Locations((106, -29.15)):
            Rectangle(ESQUISSE33_W_2, ESQUISSE33_H_2)
    extrude(amount=BOSS_EXTRU_11_DEPTH)

    # Esquisse34 → Enlèv. mat.-Extru.15 (cut)
    with BuildSketch(Plane.ZY.offset(-62)):
        Polygon((4.5, 10), (11.5, 0), (11.5, 10), align=None)
        Polygon((85.5, 10), (78.5, 0), (78.5, 10), align=None)
    extrude(amount=-ENL_V_MAT_EXTRU_15_DEPTH, mode=Mode.SUBTRACT)

    # Esquisse35 → Enlèv. mat.-Extru.16 (cut)
    with BuildSketch(Plane.ZY.offset(-135.5)):
        Polygon((4.5, 10), (11.5, 0), (11.5, 10), align=None)
        Polygon((24.7, 10), (17.7, 0), (17.7, 10), align=None)
        Polygon((69.2, 10), (76.2, 0), (76.2, 10), align=None)
        Polygon((85.5, 10), (78.5, 0), (78.5, 10), align=None)
    extrude(amount=-ENL_V_MAT_EXTRU_16_DEPTH, mode=Mode.SUBTRACT)

    # Esquisse36 → Boss.-Extru.12 (add)
    with BuildSketch(Plane.ZY.offset(-145.5)):
        with Locations((22.2, 57)):
            Rectangle(ESQUISSE36_W, ESQUISSE36_H)
        with Locations((71.7, 57)):
            Rectangle(ESQUISSE36_W, ESQUISSE36_H)
    extrude(amount=BOSS_EXTRU_12_DEPTH)

    # Esquisse37 → Enlèv. mat.-Extru.17 (cut)
    with BuildSketch(Plane(origin=(0, 57.5, 0), x_dir=(1, 0, 0), z_dir=(0, 1, 0))):
        Polygon((145.5, -19.7), (135.5, -24.7), (135.5, -19.7), align=None)
        Polygon((145.5, -74.2), (135.5, -69.2), (135.5, -74.2), align=None)
    extrude(amount=-ENL_V_MAT_EXTRU_17_DEPTH, mode=Mode.SUBTRACT)


solid = part.part
